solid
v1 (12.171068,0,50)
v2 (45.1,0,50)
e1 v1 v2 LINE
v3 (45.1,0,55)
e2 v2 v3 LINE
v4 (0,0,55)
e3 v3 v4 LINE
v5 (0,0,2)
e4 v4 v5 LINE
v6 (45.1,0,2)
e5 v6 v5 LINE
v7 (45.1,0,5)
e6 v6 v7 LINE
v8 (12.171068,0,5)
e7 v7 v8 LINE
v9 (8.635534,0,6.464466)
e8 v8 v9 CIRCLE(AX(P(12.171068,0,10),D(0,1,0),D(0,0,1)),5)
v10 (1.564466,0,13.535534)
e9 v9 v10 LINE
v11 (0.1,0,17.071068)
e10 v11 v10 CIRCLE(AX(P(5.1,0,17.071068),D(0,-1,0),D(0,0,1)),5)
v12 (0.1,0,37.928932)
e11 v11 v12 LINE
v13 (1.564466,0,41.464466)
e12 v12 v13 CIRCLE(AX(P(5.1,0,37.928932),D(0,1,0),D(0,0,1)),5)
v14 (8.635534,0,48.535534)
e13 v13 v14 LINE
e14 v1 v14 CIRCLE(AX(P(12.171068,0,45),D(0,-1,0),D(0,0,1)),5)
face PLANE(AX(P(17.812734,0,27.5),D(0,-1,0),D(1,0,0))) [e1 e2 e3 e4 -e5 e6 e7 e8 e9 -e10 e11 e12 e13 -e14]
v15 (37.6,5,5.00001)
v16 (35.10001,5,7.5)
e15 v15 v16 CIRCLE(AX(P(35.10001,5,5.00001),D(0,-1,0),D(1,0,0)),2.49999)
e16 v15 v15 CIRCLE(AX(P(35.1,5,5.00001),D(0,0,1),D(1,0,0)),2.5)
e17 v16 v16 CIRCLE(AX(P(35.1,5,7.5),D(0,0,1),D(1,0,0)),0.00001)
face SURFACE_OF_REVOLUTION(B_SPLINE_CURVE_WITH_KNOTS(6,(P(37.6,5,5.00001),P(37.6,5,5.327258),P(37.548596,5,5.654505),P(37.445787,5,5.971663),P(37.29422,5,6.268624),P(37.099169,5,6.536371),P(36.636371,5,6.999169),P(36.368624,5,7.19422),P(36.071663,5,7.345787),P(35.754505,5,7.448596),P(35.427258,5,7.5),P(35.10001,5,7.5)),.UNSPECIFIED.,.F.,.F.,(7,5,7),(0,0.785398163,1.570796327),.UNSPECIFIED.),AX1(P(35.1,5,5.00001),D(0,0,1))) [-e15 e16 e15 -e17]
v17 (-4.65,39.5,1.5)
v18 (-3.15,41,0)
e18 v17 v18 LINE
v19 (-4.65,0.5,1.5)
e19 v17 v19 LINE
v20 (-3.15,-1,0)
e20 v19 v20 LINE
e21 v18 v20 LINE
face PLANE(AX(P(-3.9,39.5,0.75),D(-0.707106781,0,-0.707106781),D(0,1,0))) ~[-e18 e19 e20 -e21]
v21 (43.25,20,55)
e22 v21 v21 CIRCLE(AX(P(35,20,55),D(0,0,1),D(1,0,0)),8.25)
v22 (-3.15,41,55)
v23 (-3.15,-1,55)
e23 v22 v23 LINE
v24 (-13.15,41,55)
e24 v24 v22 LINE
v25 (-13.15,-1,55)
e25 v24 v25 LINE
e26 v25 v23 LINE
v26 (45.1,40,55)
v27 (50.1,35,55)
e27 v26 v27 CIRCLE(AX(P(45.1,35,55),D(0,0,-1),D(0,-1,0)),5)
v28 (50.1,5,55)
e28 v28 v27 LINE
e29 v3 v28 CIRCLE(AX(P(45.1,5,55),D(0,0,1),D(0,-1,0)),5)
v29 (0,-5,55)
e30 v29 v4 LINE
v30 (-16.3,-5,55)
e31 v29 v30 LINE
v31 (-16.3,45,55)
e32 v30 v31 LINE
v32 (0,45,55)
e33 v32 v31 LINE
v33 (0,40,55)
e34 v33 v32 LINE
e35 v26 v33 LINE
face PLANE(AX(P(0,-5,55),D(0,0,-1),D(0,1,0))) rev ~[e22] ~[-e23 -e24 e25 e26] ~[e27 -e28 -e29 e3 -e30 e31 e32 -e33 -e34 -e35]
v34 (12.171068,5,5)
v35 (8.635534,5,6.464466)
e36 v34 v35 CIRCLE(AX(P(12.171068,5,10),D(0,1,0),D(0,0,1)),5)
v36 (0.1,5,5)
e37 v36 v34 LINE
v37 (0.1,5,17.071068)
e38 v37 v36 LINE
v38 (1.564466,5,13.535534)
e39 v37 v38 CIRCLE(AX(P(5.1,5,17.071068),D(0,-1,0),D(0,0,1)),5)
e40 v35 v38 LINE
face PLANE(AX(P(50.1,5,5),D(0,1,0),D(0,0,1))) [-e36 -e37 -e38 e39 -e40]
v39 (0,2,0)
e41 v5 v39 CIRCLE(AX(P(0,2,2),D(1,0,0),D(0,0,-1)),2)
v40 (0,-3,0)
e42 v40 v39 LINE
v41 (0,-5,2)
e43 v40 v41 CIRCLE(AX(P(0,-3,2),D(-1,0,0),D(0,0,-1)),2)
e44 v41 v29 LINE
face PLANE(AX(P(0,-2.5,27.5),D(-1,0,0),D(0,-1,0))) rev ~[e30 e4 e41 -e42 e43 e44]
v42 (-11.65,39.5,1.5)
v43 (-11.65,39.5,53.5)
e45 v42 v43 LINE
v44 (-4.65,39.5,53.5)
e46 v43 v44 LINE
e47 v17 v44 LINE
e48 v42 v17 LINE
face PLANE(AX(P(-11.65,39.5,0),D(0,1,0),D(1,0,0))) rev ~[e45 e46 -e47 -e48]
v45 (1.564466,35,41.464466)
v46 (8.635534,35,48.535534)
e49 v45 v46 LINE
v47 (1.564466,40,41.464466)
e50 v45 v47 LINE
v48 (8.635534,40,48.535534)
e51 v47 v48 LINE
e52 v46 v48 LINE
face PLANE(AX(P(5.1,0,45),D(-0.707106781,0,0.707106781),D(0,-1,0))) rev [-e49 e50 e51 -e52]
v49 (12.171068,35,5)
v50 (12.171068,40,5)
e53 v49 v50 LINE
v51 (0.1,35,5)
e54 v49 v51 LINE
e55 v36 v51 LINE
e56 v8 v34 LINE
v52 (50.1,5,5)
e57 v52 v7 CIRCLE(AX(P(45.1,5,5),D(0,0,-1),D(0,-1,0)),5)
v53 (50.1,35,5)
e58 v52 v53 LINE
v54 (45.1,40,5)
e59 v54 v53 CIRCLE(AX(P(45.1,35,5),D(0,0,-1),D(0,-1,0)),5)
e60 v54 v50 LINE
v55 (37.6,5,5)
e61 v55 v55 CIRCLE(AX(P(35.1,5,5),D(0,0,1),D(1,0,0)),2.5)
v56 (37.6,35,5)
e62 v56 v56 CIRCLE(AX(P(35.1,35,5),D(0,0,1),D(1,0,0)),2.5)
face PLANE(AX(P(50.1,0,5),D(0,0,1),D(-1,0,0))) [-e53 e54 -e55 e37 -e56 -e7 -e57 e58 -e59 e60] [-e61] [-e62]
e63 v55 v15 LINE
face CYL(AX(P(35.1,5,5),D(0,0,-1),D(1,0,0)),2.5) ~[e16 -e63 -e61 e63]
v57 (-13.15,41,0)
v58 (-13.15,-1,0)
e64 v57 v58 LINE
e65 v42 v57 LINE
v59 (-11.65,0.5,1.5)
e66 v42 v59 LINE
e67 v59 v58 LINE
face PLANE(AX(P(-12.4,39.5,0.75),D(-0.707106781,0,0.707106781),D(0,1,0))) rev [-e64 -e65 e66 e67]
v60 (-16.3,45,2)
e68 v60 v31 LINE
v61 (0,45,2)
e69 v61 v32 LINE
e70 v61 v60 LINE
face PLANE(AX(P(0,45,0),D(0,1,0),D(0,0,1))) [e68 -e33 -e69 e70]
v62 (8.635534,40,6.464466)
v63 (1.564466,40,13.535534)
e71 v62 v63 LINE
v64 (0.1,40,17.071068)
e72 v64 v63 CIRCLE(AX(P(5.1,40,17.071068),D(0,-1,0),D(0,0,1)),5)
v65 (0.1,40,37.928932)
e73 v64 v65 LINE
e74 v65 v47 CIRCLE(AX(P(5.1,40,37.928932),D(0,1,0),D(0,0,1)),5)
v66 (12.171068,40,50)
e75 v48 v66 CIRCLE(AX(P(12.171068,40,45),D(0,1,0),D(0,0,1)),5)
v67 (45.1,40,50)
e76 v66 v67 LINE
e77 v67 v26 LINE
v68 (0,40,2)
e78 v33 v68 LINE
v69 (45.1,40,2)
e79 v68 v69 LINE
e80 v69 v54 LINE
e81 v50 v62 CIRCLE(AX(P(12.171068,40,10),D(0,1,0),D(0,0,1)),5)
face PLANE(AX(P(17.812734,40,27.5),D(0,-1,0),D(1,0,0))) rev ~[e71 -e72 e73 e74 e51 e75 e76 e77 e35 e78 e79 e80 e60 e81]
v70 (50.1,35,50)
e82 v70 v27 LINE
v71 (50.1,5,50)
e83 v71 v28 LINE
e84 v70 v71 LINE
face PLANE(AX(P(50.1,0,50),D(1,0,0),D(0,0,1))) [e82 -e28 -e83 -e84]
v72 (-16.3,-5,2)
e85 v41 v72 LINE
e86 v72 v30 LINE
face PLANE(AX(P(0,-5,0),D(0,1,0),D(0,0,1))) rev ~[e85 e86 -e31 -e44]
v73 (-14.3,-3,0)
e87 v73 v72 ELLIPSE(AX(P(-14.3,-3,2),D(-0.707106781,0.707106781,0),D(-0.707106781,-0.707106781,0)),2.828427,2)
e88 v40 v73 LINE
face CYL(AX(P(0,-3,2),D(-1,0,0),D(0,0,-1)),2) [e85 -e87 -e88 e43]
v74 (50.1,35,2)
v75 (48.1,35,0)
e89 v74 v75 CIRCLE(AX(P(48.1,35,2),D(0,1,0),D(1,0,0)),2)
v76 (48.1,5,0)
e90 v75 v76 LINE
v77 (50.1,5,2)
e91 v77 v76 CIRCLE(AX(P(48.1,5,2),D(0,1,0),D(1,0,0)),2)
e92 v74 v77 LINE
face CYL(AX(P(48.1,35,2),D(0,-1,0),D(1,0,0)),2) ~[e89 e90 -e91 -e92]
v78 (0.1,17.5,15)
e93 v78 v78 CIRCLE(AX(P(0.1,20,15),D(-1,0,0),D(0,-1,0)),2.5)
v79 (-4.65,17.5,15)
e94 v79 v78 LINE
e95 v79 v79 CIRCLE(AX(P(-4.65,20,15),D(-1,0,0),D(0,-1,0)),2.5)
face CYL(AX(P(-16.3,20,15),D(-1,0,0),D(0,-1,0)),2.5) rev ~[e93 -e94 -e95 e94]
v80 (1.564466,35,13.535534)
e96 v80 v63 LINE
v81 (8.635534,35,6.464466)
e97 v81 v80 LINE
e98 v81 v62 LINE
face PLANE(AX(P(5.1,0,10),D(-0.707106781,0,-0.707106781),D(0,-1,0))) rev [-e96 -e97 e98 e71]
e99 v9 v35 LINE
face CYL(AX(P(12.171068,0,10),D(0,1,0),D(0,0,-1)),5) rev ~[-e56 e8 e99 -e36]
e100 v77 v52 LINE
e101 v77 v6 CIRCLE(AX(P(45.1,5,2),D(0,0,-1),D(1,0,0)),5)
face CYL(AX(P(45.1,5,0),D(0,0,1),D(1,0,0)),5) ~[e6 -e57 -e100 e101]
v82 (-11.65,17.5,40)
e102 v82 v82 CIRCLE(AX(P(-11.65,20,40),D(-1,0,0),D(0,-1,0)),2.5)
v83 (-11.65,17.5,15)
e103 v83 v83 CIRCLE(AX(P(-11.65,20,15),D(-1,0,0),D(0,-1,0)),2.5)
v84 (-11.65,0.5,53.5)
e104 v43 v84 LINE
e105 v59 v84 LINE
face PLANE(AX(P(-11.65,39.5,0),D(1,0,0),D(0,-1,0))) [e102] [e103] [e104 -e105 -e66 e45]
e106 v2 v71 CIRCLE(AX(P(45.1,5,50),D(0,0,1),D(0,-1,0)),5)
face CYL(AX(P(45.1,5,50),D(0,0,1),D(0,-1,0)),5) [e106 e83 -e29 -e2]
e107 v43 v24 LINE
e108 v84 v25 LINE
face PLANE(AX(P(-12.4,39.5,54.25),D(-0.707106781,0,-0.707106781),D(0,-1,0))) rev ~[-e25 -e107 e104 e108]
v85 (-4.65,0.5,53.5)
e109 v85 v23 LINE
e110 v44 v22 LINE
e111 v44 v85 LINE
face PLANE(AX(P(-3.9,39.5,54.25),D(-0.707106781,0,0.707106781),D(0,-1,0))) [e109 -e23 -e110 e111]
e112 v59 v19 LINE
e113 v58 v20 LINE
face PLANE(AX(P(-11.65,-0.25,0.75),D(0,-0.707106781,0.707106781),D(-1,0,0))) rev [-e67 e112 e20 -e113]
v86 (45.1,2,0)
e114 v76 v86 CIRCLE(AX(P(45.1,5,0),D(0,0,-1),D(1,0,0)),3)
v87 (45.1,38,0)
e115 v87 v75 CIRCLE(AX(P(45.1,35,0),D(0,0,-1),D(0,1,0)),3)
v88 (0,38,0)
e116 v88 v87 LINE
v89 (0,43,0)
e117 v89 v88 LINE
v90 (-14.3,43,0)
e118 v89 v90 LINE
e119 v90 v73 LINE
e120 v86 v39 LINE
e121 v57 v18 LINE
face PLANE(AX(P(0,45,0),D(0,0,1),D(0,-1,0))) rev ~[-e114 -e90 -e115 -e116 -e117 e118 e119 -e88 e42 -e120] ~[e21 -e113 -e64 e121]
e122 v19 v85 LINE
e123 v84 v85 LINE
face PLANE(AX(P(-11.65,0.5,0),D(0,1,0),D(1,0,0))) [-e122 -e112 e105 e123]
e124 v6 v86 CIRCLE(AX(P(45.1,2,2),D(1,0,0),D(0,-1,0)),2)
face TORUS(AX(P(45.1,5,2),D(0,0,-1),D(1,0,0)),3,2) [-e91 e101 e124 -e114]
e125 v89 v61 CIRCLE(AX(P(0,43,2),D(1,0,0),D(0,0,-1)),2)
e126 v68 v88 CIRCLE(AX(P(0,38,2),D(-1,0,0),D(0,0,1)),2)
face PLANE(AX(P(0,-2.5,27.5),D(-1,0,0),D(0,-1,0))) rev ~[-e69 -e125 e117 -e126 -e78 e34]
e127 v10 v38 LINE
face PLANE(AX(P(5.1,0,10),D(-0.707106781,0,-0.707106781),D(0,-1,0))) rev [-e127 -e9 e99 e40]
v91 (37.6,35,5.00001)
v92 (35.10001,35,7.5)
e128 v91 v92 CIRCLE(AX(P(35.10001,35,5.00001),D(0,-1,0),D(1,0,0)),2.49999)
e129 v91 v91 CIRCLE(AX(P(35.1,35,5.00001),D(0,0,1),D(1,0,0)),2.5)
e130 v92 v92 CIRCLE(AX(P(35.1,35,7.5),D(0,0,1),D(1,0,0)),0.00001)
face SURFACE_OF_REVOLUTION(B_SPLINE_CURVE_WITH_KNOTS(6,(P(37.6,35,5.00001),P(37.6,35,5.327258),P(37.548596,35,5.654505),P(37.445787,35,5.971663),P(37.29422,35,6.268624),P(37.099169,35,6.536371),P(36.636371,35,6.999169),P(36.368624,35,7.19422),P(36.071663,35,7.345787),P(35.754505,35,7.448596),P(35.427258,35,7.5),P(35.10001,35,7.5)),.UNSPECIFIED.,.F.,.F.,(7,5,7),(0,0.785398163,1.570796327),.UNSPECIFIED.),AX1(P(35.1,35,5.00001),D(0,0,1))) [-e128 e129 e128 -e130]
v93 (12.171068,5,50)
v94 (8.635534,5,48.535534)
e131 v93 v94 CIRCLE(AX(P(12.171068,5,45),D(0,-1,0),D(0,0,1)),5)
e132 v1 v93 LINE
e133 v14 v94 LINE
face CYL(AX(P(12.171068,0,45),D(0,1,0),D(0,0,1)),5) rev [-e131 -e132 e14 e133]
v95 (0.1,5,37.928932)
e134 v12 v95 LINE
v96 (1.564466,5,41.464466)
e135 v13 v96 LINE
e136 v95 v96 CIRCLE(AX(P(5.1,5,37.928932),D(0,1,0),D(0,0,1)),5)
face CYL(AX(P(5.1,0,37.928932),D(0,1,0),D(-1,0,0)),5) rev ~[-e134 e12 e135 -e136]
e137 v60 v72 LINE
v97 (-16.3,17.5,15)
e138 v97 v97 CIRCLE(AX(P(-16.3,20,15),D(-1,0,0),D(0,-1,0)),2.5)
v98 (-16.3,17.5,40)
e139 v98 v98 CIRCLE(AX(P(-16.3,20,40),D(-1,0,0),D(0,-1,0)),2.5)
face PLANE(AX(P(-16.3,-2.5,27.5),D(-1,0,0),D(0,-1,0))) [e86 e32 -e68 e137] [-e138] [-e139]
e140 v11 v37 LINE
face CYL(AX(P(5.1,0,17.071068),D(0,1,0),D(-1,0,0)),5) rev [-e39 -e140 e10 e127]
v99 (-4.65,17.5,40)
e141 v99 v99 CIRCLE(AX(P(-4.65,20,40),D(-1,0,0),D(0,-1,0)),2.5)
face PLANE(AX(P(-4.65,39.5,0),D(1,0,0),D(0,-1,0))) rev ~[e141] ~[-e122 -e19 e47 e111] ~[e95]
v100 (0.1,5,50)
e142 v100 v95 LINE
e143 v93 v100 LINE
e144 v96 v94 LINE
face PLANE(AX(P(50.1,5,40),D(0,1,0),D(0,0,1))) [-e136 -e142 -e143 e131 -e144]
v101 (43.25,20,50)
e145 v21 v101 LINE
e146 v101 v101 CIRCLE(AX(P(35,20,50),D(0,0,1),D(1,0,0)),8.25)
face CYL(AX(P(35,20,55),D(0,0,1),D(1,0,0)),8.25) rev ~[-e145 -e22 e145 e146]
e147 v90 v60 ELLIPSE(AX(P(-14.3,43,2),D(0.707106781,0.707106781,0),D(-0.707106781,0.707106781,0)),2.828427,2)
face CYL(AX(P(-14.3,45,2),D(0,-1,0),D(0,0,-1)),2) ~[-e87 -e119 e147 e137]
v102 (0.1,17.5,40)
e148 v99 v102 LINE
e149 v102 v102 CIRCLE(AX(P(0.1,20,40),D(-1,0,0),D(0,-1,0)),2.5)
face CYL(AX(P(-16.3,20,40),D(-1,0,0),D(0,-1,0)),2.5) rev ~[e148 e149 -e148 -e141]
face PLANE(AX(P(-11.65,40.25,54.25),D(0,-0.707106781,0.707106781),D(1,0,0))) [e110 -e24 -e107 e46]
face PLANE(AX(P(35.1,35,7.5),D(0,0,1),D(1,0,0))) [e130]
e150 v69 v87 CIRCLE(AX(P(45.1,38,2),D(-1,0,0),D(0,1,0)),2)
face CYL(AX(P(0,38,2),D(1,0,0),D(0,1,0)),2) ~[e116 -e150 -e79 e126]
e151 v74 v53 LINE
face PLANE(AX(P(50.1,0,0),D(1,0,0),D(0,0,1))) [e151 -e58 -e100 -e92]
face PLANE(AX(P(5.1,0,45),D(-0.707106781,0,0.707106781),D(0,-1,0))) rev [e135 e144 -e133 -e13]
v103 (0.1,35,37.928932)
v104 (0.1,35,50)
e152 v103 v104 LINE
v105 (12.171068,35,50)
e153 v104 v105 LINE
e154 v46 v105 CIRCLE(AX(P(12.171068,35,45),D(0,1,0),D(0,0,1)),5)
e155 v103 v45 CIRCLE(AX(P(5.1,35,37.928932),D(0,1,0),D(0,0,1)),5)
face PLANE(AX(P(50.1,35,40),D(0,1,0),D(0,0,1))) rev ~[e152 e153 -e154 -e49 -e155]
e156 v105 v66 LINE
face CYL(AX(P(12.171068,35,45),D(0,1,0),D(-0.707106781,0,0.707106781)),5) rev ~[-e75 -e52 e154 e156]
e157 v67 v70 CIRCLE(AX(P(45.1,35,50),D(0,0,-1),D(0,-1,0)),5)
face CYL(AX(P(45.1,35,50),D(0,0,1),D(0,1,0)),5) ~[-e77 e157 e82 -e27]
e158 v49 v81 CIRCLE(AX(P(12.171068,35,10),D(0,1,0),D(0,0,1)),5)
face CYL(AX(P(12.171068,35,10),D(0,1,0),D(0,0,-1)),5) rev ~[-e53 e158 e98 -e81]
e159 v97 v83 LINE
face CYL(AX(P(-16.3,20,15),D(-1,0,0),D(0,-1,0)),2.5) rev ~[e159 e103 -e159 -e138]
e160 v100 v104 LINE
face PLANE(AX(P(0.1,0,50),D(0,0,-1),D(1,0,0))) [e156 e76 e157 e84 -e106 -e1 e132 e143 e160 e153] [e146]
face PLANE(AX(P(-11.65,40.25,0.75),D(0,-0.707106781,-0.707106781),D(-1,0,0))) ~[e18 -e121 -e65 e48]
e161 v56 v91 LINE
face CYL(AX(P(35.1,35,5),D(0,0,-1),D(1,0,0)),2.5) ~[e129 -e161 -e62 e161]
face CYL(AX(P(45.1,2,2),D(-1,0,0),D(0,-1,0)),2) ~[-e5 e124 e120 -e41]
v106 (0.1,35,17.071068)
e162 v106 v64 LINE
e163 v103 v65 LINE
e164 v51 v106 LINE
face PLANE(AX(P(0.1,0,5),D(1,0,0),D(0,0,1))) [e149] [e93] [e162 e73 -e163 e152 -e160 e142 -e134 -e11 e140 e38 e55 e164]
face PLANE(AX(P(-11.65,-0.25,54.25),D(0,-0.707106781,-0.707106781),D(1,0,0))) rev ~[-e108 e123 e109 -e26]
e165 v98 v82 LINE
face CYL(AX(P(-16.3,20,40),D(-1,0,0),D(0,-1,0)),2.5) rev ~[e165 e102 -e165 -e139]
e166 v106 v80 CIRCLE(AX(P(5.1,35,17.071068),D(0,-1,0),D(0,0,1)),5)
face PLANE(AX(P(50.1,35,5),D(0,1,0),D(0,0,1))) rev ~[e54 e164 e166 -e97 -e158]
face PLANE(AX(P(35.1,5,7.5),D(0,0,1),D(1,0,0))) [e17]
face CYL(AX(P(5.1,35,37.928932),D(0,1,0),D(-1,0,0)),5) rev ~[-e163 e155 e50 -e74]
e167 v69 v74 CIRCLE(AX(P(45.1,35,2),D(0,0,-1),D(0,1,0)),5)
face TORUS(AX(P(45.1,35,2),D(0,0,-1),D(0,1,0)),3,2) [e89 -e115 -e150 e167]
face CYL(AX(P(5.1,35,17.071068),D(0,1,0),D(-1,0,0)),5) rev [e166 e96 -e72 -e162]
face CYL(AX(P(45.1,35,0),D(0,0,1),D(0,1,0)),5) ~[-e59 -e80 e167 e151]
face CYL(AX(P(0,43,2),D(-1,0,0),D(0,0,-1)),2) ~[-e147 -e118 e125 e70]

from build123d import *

# Parameters (mm, degrees)
F1_DEPTH  = 40
F2_R      = 8.25
F3_DEPTH  = 5
F4_W      = 5
F4_H      = 55
F4_W_2    = 40
F5_DEPTH  = 16.3
F6_W      = 7
F6_H      = 39
F7_DEPTH  = 55.001
F8_SIZE   = 10
F9_R      = 2.5
F10_DEPTH = 66.401
F11_W     = 30
F11_H     = 10
F12_DEPTH = 50
F13_W     = 30
F13_H     = 10
F14_DEPTH = 50
F15_SIZE  = 1.5
F16_R     = 5
F17_R     = 2.5
F18_DEPTH = 2.5
F19_R     = 2.49999
F20_R     = 2


# Not quite as in the source:
# - a fillet or chamfer is up to 0.001 mm smaller than in the source, because OpenCascade refuses the exact size
# - a feature names something its author has since deleted; it is built from what else it names


with BuildPart() as f1:
    # F0 (on Front) → F1 (new body)
    with BuildSketch(Plane.XZ):
        Polygon((0, 55), (0, 0), (50.1, 0), (50.1, 5), (0.1, 5), (0.1, 50), (50.1, 50), (50.1, 55), align=None)
    extrude(amount=-F1_DEPTH)

    # F2 (on face) → F3 (cut, through all)
    with BuildSketch(Plane.XY.offset(55)):
        with Locations((35, 20)):
            Circle(F2_R)
    extrude(amount=-F3_DEPTH, mode=Mode.SUBTRACT)

    # F4 (on face) → F5 (join)
    with BuildSketch(Plane(origin=(0, 0, 0), x_dir=(0, -1, 0), z_dir=(-1, 0, 0))):
        with Locations((2.5, 27.5)):
            Rectangle(F4_W, F4_H)
        with Locations((-20, 27.5)):
            Rectangle(F4_W_2, F4_H)
        with Locations((-42.5, 27.5)):
            Rectangle(F4_W, F4_H)
    extrude(amount=F5_DEPTH)

    # F6 (on face) → F7 (cut, through all)
    with BuildSketch(Plane(origin=(0, 0, 0), x_dir=(1, 0, 0), z_dir=(0, 0, -1))):
        with Locations((-8.15, -20)):
            Rectangle(F6_W, F6_H)
    extrude(amount=-F7_DEPTH, mode=Mode.SUBTRACT)

    # F8
    f8_edges = [f1.edges().sort_by_distance(p)[0] for p in [
        (0.1, 20, 5),
        (0.1, 20, 50),
    ]]
    chamfer(f8_edges, length=F8_SIZE)

    # F9 (on face) → F10 (cut, through all)
    with BuildSketch(Plane(origin=(-16.3, 0, 0), x_dir=(0, -1, 0), z_dir=(-1, 0, 0))):
        with Locations((-20, 15)):
            Circle(F9_R)
        with Locations((-20, 40)):
            Circle(F9_R)
    extrude(amount=-F10_DEPTH, mode=Mode.SUBTRACT)

    # F11 (on face) → F12 (cut)
    with BuildSketch(Plane.YZ.offset(50.1)):
        with Locations((20, 10)):
            Rectangle(F11_W, F11_H)
    extrude(amount=-F12_DEPTH, mode=Mode.SUBTRACT)

    # F13 (on face) → F14 (cut)
    with BuildSketch(Plane.YZ.offset(50.1)):
        with Locations((20, 45)):
            Rectangle(F13_W, F13_H)
    extrude(amount=-F14_DEPTH, mode=Mode.SUBTRACT)

    # F15
    f15_edges = [f1.edges().sort_by_distance(p)[0] for p in [
        (-11.65, 20, 55),
        (-8.15, 39.5, 55),
        (-4.65, 20, 55),
        (-8.15, 0.5, 55),
        (-11.65, 20, 0),
        (-8.15, 0.5, 0),
        (-4.65, 20, 0),
        (-8.15, 39.5, 0),
    ]]
    chamfer(f15_edges, length=F15_SIZE)

    # F16
    f16_edges = [f1.edges().sort_by_distance(p)[0] for p in [
        (50.1, 0, 52.5),
        (50.1, 40, 52.5),
        (50.1, 40, 2.5),
        (50.1, 0, 2.5),
        (0.1, 37.5, 15),
        (0.1, 2.5, 15),
        (10.1, 2.5, 5),
        (10.1, 37.5, 5),
        (0.1, 2.5, 40),
        (0.1, 37.5, 40),
        (10.1, 37.5, 50),
        (10.1, 2.5, 50),
    ]]
    fillet(f16_edges, radius=F16_R)

    # F17 (on face) → F18 (join)
    with BuildSketch(Plane.XY.offset(5)):
        with Locations((35.1, 5)):
            Circle(F17_R)
        with Locations((35.1, 35)):
            Circle(F17_R)
    extrude(amount=F18_DEPTH)

    # F19 (radius 2.5 in the source; OpenCascade refuses exactly that, so slightly less here)
    f19_edges = [f1.edges().sort_by_distance(p)[0] for p in [
        (32.6, 5, 7.5),
        (32.6, 35, 7.5),
    ]]
    fillet(f19_edges, radius=F19_R)

    # F20
    f20_edges = [f1.edges().sort_by_distance(p)[0] for p in [
        (-8.15, -5, 0),
        (-8.15, 45, 0),
        (-16.3, 20, 0),
        (22.55, 40, 0),
    ]]
    fillet(f20_edges, radius=F20_R)


solid = f1.part
